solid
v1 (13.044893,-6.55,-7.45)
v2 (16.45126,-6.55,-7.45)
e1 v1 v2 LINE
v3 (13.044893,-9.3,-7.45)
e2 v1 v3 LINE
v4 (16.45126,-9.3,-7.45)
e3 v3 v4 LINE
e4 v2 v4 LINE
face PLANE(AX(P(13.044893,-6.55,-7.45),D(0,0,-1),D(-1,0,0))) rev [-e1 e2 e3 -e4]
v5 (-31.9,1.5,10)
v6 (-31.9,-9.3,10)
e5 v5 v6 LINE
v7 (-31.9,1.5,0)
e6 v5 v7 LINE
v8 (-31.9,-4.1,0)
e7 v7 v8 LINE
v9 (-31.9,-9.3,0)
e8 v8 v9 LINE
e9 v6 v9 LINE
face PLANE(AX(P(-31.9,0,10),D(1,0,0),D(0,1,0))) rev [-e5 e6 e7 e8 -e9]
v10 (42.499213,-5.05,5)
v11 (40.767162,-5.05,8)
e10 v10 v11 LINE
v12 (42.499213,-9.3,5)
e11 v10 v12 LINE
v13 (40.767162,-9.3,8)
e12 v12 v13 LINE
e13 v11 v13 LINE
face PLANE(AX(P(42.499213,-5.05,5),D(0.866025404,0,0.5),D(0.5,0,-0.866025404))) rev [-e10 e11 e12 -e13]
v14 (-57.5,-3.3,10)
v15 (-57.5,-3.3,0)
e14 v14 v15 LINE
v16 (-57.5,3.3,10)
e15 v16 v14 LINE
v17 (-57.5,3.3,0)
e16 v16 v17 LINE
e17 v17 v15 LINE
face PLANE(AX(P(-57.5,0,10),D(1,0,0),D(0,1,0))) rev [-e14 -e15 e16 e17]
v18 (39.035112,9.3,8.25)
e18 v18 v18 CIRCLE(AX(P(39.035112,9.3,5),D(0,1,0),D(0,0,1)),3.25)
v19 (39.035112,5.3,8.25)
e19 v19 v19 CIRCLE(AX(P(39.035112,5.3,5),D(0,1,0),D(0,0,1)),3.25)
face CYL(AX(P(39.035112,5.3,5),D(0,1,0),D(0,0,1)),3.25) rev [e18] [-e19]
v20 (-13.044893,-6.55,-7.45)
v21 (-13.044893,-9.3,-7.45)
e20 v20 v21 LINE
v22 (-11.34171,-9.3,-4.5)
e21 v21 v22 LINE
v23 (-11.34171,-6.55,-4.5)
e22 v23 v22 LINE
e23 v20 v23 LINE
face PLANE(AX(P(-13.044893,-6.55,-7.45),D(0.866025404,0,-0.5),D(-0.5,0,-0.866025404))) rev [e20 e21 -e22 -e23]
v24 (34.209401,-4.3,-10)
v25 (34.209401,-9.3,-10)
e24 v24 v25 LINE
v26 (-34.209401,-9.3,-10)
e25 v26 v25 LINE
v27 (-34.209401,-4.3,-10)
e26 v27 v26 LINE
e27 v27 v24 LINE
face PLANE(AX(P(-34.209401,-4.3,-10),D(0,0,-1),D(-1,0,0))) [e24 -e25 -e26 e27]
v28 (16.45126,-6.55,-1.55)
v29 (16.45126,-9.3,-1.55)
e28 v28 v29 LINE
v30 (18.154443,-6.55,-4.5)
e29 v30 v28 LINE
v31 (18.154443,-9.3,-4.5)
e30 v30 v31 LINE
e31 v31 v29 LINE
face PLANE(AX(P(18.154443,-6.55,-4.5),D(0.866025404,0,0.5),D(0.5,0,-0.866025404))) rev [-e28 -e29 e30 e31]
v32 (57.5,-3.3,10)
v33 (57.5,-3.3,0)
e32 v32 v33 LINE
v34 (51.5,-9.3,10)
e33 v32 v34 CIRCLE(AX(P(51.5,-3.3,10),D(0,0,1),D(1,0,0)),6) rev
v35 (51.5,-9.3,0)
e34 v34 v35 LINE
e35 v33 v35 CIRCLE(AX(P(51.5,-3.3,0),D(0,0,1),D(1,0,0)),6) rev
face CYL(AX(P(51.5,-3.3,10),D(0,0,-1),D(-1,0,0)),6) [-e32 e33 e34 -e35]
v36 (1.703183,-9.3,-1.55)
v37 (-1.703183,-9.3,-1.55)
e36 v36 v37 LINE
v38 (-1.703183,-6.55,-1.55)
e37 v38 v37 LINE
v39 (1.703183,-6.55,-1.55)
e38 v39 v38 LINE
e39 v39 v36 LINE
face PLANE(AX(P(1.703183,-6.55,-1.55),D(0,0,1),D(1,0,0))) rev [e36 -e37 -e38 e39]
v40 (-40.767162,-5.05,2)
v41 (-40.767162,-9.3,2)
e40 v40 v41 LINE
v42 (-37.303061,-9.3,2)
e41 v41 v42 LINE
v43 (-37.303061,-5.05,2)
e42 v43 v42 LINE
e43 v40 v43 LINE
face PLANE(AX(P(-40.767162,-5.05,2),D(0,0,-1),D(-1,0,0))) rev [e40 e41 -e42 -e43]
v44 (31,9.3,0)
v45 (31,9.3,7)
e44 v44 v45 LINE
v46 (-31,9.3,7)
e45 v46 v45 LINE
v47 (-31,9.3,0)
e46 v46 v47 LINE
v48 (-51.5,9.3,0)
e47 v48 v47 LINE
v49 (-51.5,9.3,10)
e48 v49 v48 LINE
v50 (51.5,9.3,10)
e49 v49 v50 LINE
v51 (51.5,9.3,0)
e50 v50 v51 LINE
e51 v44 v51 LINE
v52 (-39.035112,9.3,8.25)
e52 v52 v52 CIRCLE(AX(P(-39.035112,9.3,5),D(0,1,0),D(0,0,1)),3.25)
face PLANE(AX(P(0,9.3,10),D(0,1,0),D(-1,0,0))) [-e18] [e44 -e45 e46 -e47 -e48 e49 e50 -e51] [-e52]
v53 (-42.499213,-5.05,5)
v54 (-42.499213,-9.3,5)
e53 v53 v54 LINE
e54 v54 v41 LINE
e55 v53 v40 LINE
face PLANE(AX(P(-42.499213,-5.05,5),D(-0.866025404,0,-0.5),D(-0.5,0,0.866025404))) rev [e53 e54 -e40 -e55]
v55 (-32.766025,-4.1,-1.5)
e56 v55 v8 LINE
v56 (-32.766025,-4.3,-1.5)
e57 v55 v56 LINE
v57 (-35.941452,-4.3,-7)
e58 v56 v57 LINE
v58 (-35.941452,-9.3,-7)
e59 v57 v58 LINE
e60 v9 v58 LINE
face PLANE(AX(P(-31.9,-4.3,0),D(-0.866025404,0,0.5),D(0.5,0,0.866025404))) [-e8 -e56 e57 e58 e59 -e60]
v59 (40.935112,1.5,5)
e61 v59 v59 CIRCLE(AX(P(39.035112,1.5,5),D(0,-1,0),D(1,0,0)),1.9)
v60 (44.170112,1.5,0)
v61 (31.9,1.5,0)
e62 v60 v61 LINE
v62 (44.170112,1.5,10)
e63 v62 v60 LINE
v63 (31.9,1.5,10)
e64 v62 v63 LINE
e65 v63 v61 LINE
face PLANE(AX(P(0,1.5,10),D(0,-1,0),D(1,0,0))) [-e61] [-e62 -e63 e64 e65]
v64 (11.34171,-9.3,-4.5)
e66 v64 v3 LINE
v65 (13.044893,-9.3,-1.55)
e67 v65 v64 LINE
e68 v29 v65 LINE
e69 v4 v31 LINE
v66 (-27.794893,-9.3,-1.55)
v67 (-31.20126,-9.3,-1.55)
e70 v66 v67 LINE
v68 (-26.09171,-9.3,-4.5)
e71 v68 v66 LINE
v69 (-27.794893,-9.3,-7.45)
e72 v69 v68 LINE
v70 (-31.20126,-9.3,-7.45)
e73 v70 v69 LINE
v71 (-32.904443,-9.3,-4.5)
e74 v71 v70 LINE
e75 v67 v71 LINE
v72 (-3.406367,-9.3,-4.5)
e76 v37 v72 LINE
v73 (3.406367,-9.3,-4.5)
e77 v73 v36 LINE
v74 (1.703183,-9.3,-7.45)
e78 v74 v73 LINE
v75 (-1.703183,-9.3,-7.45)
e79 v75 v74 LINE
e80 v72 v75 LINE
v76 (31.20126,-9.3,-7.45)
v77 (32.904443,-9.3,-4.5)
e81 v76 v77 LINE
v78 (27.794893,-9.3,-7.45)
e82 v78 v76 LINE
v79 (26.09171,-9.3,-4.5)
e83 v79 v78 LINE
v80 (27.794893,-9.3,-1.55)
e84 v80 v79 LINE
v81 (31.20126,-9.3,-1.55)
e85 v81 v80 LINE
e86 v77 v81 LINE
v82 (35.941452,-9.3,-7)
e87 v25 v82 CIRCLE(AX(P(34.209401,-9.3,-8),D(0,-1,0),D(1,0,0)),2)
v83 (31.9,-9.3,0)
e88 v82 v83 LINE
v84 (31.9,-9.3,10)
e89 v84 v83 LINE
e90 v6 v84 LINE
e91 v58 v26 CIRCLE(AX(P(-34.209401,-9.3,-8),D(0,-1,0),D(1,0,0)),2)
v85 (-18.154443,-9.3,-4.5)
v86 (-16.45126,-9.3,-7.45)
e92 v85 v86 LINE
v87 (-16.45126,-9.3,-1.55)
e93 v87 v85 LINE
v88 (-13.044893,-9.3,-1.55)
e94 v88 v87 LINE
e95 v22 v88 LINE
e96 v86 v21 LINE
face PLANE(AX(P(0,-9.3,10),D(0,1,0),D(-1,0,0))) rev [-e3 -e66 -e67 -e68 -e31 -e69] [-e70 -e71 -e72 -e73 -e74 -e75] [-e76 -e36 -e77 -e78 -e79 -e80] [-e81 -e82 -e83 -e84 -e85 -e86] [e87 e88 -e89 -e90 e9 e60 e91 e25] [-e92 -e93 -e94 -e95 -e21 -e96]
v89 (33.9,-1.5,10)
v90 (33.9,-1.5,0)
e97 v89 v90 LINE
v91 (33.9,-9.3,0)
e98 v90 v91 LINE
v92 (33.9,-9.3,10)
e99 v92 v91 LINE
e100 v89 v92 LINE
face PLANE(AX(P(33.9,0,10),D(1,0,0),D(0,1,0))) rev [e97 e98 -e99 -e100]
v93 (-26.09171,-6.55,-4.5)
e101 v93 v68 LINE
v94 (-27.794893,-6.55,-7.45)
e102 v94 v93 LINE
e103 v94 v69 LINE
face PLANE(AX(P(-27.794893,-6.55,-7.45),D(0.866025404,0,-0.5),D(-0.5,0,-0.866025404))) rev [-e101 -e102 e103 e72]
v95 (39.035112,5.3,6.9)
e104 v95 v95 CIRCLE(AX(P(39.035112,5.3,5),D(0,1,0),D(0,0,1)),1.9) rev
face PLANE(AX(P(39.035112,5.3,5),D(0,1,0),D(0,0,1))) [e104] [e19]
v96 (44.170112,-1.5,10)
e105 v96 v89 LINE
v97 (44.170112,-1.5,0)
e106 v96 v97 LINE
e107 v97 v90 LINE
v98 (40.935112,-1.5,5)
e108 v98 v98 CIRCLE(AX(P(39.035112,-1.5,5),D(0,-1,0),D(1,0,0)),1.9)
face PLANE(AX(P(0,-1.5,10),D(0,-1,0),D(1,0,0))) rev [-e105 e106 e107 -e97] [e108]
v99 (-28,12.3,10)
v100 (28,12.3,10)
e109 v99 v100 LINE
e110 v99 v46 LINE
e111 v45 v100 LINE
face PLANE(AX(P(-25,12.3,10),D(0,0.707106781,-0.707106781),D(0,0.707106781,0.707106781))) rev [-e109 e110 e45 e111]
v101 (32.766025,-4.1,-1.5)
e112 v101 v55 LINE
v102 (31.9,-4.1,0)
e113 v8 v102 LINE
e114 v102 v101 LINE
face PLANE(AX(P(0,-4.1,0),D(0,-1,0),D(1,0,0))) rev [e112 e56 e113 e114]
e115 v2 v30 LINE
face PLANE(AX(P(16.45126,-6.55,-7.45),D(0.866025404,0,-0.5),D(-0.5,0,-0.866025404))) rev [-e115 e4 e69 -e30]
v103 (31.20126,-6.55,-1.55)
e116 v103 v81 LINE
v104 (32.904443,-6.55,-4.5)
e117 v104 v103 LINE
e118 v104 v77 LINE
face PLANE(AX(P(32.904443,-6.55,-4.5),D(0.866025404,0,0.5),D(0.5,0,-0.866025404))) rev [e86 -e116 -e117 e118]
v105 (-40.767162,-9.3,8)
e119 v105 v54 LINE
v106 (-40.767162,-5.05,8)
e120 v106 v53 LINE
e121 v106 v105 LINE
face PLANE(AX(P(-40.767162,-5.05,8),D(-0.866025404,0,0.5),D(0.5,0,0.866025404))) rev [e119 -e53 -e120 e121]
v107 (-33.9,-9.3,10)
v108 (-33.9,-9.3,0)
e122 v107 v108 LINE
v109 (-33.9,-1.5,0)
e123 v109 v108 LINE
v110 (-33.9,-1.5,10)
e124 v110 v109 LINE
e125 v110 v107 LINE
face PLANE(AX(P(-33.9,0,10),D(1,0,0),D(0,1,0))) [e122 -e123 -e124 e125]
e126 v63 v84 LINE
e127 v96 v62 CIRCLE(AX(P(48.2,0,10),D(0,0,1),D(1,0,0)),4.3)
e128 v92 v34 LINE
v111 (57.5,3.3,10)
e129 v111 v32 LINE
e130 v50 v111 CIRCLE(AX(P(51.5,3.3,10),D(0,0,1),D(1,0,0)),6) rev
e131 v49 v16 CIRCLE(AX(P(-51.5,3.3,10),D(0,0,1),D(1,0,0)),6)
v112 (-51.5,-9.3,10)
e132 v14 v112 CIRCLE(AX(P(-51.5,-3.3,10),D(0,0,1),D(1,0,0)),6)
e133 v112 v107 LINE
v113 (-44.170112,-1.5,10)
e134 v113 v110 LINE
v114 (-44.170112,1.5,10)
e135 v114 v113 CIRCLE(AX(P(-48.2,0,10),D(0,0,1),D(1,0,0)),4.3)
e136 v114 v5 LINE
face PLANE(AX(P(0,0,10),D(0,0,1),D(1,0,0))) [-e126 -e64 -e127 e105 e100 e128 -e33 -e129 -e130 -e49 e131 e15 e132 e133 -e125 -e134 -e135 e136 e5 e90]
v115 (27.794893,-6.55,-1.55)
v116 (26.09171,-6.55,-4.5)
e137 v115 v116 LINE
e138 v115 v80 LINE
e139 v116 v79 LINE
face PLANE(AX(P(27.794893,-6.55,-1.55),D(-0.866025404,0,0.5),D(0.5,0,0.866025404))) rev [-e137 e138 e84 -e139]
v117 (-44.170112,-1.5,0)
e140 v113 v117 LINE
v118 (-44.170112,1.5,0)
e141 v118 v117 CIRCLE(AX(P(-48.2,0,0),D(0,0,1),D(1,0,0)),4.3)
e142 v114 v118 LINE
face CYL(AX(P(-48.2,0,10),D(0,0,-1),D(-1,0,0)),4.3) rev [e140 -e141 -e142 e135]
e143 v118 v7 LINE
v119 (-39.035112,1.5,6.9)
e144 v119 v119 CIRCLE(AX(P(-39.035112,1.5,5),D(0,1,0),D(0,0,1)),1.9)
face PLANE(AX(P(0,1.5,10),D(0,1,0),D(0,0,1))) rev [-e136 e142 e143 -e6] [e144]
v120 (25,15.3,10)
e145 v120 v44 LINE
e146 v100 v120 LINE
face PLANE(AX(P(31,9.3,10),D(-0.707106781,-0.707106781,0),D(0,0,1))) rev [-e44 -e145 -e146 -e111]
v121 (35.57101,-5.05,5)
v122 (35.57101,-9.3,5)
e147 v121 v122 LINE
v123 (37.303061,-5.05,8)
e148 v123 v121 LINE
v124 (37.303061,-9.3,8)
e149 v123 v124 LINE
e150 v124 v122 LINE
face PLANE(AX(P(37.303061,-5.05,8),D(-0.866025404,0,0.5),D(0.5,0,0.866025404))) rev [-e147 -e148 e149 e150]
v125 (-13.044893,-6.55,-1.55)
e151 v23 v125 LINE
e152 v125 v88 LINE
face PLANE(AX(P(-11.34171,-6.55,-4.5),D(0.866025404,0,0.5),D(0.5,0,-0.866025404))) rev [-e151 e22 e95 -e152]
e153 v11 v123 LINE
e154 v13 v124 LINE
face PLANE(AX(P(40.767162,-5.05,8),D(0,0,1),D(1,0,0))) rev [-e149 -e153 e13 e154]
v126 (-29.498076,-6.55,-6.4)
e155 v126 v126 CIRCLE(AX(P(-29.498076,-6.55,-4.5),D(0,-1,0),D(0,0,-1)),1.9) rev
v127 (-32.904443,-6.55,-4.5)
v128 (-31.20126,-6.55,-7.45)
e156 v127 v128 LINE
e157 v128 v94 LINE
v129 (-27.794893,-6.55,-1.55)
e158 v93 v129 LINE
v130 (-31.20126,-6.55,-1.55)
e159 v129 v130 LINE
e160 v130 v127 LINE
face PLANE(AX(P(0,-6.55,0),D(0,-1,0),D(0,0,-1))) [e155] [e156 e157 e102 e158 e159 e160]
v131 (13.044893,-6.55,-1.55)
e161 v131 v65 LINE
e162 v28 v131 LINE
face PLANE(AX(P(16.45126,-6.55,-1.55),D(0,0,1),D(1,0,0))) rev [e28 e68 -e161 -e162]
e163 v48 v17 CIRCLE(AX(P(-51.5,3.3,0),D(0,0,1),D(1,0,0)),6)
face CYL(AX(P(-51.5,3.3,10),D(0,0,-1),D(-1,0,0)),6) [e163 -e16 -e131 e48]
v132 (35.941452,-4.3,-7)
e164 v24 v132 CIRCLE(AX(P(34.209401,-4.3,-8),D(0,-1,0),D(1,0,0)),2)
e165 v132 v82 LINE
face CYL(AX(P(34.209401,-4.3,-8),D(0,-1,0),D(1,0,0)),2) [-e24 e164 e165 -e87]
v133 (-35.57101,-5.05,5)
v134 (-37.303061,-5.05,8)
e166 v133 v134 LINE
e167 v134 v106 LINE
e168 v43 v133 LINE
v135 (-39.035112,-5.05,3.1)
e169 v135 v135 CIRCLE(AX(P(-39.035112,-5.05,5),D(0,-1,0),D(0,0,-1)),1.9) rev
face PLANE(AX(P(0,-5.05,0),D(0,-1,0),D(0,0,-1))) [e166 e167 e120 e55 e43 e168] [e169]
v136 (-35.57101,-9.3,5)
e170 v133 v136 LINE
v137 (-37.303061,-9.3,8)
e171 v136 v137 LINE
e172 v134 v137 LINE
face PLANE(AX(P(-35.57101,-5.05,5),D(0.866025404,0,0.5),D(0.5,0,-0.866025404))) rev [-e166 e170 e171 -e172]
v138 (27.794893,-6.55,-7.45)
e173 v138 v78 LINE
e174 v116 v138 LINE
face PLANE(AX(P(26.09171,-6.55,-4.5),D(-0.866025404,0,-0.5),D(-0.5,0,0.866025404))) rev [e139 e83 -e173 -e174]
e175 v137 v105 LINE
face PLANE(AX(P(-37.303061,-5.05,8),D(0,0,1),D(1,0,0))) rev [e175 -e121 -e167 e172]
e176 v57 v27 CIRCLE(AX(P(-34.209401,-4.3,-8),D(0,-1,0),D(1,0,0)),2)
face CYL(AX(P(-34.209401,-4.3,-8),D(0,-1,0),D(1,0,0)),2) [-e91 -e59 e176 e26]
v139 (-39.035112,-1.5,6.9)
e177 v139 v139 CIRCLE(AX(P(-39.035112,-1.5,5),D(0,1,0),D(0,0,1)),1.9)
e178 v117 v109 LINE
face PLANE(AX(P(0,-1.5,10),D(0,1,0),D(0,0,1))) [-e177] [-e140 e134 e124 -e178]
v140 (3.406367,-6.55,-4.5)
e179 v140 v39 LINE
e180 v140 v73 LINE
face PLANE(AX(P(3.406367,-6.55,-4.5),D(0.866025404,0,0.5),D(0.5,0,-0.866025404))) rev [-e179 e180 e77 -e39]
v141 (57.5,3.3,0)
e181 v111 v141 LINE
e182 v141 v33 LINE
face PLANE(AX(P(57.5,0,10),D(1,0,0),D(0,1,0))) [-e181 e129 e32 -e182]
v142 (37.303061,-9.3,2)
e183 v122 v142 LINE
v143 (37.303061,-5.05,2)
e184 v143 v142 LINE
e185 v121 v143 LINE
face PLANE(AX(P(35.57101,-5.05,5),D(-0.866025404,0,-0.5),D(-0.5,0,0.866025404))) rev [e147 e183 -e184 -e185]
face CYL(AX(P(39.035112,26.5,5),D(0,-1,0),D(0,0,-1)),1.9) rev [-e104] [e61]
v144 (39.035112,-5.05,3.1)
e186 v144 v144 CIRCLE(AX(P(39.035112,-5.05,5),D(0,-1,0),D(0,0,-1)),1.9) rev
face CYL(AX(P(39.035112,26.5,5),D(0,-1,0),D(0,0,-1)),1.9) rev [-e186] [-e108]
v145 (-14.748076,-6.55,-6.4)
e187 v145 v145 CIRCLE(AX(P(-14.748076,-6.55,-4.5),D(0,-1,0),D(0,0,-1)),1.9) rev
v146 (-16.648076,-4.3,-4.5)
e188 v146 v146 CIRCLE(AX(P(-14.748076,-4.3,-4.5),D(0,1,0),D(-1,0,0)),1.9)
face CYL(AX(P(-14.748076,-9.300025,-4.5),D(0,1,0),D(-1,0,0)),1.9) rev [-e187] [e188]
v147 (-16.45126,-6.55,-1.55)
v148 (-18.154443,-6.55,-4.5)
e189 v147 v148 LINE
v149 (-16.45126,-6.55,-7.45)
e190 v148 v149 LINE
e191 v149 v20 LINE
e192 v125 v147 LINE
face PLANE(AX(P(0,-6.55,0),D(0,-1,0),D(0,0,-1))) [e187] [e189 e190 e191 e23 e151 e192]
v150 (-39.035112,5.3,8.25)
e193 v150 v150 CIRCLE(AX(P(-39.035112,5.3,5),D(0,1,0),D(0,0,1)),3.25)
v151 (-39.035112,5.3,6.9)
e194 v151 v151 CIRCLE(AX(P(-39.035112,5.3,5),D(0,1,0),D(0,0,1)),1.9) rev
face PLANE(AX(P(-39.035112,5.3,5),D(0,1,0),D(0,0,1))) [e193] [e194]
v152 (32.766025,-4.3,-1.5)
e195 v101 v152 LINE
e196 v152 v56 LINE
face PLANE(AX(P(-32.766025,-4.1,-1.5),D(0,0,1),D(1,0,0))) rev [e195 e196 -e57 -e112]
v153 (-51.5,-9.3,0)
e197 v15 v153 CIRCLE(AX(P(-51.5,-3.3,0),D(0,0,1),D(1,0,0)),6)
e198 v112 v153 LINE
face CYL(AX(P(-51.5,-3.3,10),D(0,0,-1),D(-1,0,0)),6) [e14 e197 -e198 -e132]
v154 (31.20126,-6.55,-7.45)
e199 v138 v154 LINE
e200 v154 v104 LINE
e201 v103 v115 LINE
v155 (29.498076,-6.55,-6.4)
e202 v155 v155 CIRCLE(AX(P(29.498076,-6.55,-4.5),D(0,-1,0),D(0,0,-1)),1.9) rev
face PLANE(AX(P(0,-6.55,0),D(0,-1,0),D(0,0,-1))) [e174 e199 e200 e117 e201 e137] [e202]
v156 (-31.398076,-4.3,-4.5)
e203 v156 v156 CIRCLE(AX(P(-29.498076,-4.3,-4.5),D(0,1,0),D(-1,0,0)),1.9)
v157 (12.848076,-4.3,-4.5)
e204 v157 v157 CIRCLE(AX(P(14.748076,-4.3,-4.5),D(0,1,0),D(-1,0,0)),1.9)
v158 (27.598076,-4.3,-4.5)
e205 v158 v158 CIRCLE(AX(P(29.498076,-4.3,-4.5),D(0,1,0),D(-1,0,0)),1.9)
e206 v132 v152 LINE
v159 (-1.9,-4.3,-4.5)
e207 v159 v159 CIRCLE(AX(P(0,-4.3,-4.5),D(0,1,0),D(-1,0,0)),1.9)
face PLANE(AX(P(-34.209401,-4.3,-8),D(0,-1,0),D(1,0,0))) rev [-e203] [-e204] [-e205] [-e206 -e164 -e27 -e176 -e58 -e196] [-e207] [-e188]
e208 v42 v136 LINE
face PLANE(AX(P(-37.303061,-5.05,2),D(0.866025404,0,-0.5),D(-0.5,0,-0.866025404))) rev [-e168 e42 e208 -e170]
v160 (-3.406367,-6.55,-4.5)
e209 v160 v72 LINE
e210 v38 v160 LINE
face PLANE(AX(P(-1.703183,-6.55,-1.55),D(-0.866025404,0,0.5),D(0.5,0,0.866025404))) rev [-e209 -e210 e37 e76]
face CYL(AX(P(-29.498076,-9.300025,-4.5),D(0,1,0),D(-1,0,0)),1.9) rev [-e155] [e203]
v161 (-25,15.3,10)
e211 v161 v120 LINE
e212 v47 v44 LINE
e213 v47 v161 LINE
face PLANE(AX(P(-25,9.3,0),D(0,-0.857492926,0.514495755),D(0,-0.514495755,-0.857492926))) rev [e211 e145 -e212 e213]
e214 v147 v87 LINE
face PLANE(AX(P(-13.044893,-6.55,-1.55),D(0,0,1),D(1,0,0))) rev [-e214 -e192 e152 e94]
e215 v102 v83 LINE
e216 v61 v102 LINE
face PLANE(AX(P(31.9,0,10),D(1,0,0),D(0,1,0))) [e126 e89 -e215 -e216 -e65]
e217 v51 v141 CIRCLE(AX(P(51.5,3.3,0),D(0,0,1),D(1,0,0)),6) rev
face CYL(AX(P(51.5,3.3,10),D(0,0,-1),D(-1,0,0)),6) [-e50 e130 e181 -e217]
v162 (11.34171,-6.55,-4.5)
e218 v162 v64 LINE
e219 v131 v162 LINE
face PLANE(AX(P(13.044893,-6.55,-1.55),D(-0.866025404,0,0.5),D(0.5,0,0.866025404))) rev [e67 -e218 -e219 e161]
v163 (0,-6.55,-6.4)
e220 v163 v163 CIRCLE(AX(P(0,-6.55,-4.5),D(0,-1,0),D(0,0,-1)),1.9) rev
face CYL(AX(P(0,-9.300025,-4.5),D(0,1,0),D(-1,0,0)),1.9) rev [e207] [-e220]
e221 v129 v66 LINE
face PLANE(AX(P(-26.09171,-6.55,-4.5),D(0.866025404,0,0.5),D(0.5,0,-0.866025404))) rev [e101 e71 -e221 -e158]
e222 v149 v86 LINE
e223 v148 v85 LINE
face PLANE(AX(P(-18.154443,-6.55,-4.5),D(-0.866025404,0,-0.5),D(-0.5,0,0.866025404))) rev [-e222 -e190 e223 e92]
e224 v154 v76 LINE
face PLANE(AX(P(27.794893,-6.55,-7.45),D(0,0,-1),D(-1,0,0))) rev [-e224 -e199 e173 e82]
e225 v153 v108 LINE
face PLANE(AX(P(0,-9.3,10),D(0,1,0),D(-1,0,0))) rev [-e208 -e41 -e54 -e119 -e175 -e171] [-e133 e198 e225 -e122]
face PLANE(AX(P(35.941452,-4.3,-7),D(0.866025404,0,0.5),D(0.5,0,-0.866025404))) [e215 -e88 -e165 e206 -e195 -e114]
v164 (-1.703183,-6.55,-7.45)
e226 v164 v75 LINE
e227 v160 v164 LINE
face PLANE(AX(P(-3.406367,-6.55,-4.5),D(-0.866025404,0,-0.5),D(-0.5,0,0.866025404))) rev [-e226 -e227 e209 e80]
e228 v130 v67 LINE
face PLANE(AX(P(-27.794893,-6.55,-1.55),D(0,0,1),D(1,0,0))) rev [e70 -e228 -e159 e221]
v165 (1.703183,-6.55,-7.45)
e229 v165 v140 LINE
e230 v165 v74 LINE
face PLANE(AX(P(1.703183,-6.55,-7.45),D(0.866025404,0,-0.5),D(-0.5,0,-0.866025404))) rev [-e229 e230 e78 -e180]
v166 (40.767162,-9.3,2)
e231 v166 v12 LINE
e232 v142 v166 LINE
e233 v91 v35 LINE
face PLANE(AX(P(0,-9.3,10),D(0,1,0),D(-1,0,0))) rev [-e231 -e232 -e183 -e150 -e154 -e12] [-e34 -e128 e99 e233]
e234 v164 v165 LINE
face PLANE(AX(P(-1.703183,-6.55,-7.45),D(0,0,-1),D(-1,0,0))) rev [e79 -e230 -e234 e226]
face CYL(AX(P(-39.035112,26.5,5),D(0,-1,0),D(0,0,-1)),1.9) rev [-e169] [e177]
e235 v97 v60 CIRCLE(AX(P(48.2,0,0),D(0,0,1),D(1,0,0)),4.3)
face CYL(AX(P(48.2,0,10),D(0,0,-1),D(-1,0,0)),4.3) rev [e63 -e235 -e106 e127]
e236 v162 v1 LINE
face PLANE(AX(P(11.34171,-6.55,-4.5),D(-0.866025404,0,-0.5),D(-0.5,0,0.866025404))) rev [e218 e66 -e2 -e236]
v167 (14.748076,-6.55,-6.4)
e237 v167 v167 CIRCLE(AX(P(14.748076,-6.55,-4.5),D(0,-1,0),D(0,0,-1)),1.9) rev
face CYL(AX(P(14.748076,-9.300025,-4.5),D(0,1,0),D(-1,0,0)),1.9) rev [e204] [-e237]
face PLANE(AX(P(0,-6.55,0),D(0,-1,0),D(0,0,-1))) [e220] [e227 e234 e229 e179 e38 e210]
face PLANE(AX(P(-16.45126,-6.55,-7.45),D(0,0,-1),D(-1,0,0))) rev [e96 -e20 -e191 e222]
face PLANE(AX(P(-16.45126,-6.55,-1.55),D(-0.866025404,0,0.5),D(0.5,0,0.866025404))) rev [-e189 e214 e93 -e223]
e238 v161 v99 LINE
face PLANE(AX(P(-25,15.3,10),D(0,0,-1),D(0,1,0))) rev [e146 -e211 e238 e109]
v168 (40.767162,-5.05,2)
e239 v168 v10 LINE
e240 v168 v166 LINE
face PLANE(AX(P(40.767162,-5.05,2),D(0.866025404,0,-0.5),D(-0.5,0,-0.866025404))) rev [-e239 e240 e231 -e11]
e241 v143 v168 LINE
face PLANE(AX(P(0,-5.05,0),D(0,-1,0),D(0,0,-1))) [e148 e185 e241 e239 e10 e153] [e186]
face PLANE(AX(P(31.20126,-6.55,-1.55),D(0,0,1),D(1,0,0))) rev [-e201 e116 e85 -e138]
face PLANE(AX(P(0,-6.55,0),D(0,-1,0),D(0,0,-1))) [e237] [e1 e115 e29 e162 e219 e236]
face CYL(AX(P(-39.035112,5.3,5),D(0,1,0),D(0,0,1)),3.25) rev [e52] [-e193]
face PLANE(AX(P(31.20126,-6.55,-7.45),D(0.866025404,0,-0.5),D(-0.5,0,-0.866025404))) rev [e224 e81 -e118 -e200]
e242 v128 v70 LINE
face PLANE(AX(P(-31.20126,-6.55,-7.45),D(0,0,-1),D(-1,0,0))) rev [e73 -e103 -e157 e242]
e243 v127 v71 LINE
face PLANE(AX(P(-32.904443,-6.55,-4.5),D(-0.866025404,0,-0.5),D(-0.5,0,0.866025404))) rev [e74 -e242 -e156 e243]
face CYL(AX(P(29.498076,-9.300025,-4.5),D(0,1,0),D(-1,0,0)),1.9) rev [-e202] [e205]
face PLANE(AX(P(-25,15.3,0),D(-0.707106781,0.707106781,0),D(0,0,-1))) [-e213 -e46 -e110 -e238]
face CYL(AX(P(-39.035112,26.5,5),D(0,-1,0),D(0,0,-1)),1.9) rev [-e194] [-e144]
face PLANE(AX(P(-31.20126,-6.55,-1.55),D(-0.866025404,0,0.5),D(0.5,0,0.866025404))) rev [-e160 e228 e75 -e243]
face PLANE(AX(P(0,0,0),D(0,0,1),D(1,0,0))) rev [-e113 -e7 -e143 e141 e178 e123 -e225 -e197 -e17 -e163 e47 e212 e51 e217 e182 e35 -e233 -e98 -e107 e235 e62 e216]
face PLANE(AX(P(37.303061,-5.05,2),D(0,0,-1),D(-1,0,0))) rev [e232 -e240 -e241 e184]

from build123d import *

# Parameters (mm, degrees)
SALIENTE_EXTRUIR1_DEPTH = 10
CROQUIS2_R              = 1.9
CORTAR_EXTRUIR1_DEPTH   = 25
CROQUIS5_R              = 3.25
CORTAR_EXTRUIR3_DEPTH   = 4
CORTAR_EXTRUIR4_DEPTH   = 4.25
SALIENTE_EXTRUIR2_DEPTH = 25
CHAFL_N2_SIZE           = 6
SALIENTE_EXTRUIR3_DEPTH = 5
CROQUIS9_R              = 1.9
CORTAR_EXTRUIR5_DEPTH   = 62.56630572
CORTAR_EXTRUIR6_DEPTH   = 2.75
SALIENTE_EXTRUIR4_DEPTH = 0.2


with BuildPart() as part:
    # Croquis1 → Saliente-Extruir1 (new body)
    with BuildSketch(Plane.XY):
        with BuildLine():
            Line((51.5, 9.3), (-51.5, 9.3))
            ThreePointArc((-51.5, 9.3), (-55.742640687, 7.542640687), (-57.5, 3.3))
            Line((-57.5, 3.3), (-57.5, -3.3))
            ThreePointArc((-57.5, -3.3), (-55.742640687, -7.542640687), (-51.5, -9.3))
            Line((-51.5, -9.3), (-33.9, -9.3))
            Line((-33.9, -9.3), (-33.9, -1.5))
            Line((-33.9, -1.5), (-44.170111664, -1.5))
            ThreePointArc((-44.170111664, -1.5), (-52.5, 0), (-44.170111664, 1.5))
            Line((-44.170111664, 1.5), (-31.9, 1.5))
            Line((-31.9, 1.5), (-31.9, -9.3))
            Line((-31.9, -9.3), (31.9, -9.3))
            Line((31.9, -9.3), (31.9, 1.5))
            Line((31.9, 1.5), (44.170111664, 1.5))
            ThreePointArc((44.170111664, 1.5), (48.962063041, 4.231933355), (52.5, 0))
            ThreePointArc((52.5, 0), (48.962063041, -4.231933355), (44.170111664, -1.5))
            Line((44.170111664, -1.5), (33.9, -1.5))
            Line((33.9, -1.5), (33.9, -9.3))
            Line((33.9, -9.3), (51.5, -9.3))
            ThreePointArc((51.5, -9.3), (55.742640687, -7.542640687), (57.5, -3.3))
            Line((57.5, -3.3), (57.5, 3.3))
            ThreePointArc((57.5, 3.3), (55.742640687, 7.542640687), (51.5, 9.3))
        make_face()
    extrude(amount=SALIENTE_EXTRUIR1_DEPTH)

    # Croquis2 → Cortar-Extruir1 (cut, symmetric)
    with BuildSketch(Plane.XZ.offset(-1.5)):
        with Locations(Location((-39.035111664, 5, 0), (0, 0, 180))):
            Circle(CROQUIS2_R)
        with Locations(Location((39.035111664, 5, 0), (0, 0, 180))):
            Circle(CROQUIS2_R)
    extrude(amount=CORTAR_EXTRUIR1_DEPTH, both=True, mode=Mode.SUBTRACT)

    # Croquis5 → Cortar-Extruir3 (cut)
    with BuildSketch(Plane(origin=(0, 9.3, 0), x_dir=(1, 0, 0), z_dir=(0, 1, 0))):
        with Locations(Location((-39.035111664, -5, 0), (0, 0, 270))):
            Circle(CROQUIS5_R)
        with Locations(Location((39.035111664, -5, 0), (0, 0, 270))):
            Circle(CROQUIS5_R)
    extrude(amount=-CORTAR_EXTRUIR3_DEPTH, mode=Mode.SUBTRACT)

    # Croquis6 → Cortar-Extruir4 (cut)
    with BuildSketch(Plane(origin=(0, -9.3, 0), x_dir=(-1, 0, 0), z_dir=(0, -1, 0))):
        Polygon((42.499213279, -5), (40.767162472, -2), (37.303060857, -2), (35.571010049, -5), (37.303060857, -8), (40.767162472, -8), align=None)
        Polygon((-42.499213279, -5), (-40.767162472, -8), (-37.303060857, -8), (-35.571010049, -5), (-37.303060857, -2), (-40.767162472, -2), align=None)
    extrude(amount=-CORTAR_EXTRUIR4_DEPTH, mode=Mode.SUBTRACT)

    # Croquis7 → Saliente-Extruir2 (add, symmetric)
    with BuildSketch(Plane.ZY):
        Polygon((0, 9.3), (10, 15.3), (10, 12.3), (7, 9.3), align=None)
    extrude(amount=SALIENTE_EXTRUIR2_DEPTH, both=True)

    # Chaflán2
    # the kernel refuses this chamfer: 6 mm, written as the material it adds along each edge
    with BuildSketch(Plane(origin=(-25, 9.3, 22.430097928), x_dir=(-0.9996219169112968, -0.02749587661058678, 0), z_dir=(0, 0, -1))) as chafl_n2_piece_1_section:
        Polygon((CHAFL_N2_SIZE * 0.999621916911, CHAFL_N2_SIZE * 0.0274958766106), (-CHAFL_N2_SIZE * 0.0274958766106, CHAFL_N2_SIZE * 0.999621916911), (0, 0), align=None)
    chafl_n2_piece_1 = extrude(amount=37.860195856, mode=Mode.PRIVATE)
    chafl_n2_piece_1 = split(chafl_n2_piece_1, bisect_by=Plane(origin=(-27.180769231, 9.432692308, 7.132692308), z_dir=(0, 0.7071067811865436, -0.7071067811865516)), keep=Keep.TOP, mode=Mode.PRIVATE)
    chafl_n2_piece_1 = split(chafl_n2_piece_1, bisect_by=Plane(origin=(-27.180769231, 10.938461538, 10), z_dir=(0, 0, -1)), keep=Keep.TOP, mode=Mode.PRIVATE)
    chafl_n2_piece_1 = split(chafl_n2_piece_1, bisect_by=Plane(origin=(-27.180769231, 12.216176471, 4.860294118), z_dir=(0, -0.8574929257125441, 0.5144957554275267)), keep=Keep.TOP, mode=Mode.PRIVATE)
    add(chafl_n2_piece_1)
    with BuildSketch(Plane(origin=(25, 9.3, 22.430097928), x_dir=(0.9996219169112969, -0.02749587661058621, 0), z_dir=(0, 0, -1))) as chafl_n2_piece_2_section:
        Polygon((CHAFL_N2_SIZE * 0.999621916911, -CHAFL_N2_SIZE * 0.0274958766106), (-CHAFL_N2_SIZE * 0.0274958766106, -CHAFL_N2_SIZE * 0.999621916911), (0, 0), align=None)
    chafl_n2_piece_2 = extrude(amount=37.860195856, mode=Mode.PRIVATE)
    chafl_n2_piece_2 = split(chafl_n2_piece_2, bisect_by=Plane(origin=(27.180769231, 9.432692308, 7.132692308), z_dir=(0, 0.7071067811865436, -0.7071067811865516)), keep=Keep.TOP, mode=Mode.PRIVATE)
    chafl_n2_piece_2 = split(chafl_n2_piece_2, bisect_by=Plane(origin=(27.180769231, 10.938461538, 10), z_dir=(0, 0, -1)), keep=Keep.TOP, mode=Mode.PRIVATE)
    chafl_n2_piece_2 = split(chafl_n2_piece_2, bisect_by=Plane(origin=(27.180769231, 12.216176471, 4.860294118), z_dir=(0, -0.8574929257125441, 0.5144957554275267)), keep=Keep.TOP, mode=Mode.PRIVATE)
    add(chafl_n2_piece_2)

    # Croquis8 → Saliente-Extruir3 (add)
    with BuildSketch(Plane.XZ.offset(9.3)):
        with BuildLine():
            Line((-31.9, 0), (-35.941451884, -7))
            ThreePointArc((-35.941451884, -7), (-35.941451884, -9), (-34.209401077, -10))
            Line((-34.209401077, -10), (34.209401077, -10))
            ThreePointArc((34.209401077, -10), (35.941451884, -9), (35.941451884, -7))
            Line((35.941451884, -7), (31.9, 0))
            Line((31.9, 0), (-31.9, 0))
        make_face()
    extrude(amount=-SALIENTE_EXTRUIR3_DEPTH)

    # Croquis9 → Cortar-Extruir5 (cut, through all)
    with BuildSketch(Plane(origin=(0, -4.3, 0), x_dir=(1, 0, 0), z_dir=(0, 1, 0))):
        with Locations(Location((0, 4.5, 0), (0, 0, 180))):
            Circle(CROQUIS9_R)
        with Locations(Location((-29.498076211, 4.5, 0), (0, 0, 180))):
            Circle(CROQUIS9_R)
        with Locations(Location((-14.748076211, 4.5, 0), (0, 0, 180))):
            Circle(CROQUIS9_R)
        with Locations(Location((14.748076211, 4.5, 0), (0, 0, 180))):
            Circle(CROQUIS9_R)
        with Locations(Location((29.498076211, 4.5, 0), (0, 0, 180))):
            Circle(CROQUIS9_R)
    extrude(amount=-CORTAR_EXTRUIR5_DEPTH, mode=Mode.SUBTRACT)

    # Croquis10 → Cortar-Extruir6 (cut)
    with BuildSketch(Plane.XZ.offset(9.3)):
        Polygon((3.406366588, -4.5), (1.703183294, -1.55), (-1.703183294, -1.55), (-3.406366588, -4.5), (-1.703183294, -7.45), (1.703183294, -7.45), align=None)
        Polygon((-11.341709623, -4.5), (-13.044892917, -1.55), (-16.451259505, -1.55), (-18.1544428, -4.5), (-16.451259505, -7.45), (-13.044892917, -7.45), align=None)
        Polygon((-26.091709623, -4.5), (-27.794892917, -1.55), (-31.201259505, -1.55), (-32.9044428, -4.5), (-31.201259505, -7.45), (-27.794892917, -7.45), align=None)
        Polygon((18.1544428, -4.5), (16.451259505, -1.55), (13.044892917, -1.55), (11.341709623, -4.5), (13.044892917, -7.45), (16.451259505, -7.45), align=None)
        Polygon((32.9044428, -4.5), (31.201259505, -1.55), (27.794892917, -1.55), (26.091709623, -4.5), (27.794892917, -7.45), (31.201259505, -7.45), align=None)
    extrude(amount=-CORTAR_EXTRUIR6_DEPTH, mode=Mode.SUBTRACT)

    # Croquis11 → Saliente-Extruir4 (add)
    with BuildSketch(Plane(origin=(0, -4.3, 0), x_dir=(1, 0, 0), z_dir=(0, 1, 0))):
        Polygon((-31.9, 0), (-32.766025404, 1.5), (32.766025404, 1.5), (31.9, 0), align=None)
    extrude(amount=SALIENTE_EXTRUIR4_DEPTH)


solid = part.part
